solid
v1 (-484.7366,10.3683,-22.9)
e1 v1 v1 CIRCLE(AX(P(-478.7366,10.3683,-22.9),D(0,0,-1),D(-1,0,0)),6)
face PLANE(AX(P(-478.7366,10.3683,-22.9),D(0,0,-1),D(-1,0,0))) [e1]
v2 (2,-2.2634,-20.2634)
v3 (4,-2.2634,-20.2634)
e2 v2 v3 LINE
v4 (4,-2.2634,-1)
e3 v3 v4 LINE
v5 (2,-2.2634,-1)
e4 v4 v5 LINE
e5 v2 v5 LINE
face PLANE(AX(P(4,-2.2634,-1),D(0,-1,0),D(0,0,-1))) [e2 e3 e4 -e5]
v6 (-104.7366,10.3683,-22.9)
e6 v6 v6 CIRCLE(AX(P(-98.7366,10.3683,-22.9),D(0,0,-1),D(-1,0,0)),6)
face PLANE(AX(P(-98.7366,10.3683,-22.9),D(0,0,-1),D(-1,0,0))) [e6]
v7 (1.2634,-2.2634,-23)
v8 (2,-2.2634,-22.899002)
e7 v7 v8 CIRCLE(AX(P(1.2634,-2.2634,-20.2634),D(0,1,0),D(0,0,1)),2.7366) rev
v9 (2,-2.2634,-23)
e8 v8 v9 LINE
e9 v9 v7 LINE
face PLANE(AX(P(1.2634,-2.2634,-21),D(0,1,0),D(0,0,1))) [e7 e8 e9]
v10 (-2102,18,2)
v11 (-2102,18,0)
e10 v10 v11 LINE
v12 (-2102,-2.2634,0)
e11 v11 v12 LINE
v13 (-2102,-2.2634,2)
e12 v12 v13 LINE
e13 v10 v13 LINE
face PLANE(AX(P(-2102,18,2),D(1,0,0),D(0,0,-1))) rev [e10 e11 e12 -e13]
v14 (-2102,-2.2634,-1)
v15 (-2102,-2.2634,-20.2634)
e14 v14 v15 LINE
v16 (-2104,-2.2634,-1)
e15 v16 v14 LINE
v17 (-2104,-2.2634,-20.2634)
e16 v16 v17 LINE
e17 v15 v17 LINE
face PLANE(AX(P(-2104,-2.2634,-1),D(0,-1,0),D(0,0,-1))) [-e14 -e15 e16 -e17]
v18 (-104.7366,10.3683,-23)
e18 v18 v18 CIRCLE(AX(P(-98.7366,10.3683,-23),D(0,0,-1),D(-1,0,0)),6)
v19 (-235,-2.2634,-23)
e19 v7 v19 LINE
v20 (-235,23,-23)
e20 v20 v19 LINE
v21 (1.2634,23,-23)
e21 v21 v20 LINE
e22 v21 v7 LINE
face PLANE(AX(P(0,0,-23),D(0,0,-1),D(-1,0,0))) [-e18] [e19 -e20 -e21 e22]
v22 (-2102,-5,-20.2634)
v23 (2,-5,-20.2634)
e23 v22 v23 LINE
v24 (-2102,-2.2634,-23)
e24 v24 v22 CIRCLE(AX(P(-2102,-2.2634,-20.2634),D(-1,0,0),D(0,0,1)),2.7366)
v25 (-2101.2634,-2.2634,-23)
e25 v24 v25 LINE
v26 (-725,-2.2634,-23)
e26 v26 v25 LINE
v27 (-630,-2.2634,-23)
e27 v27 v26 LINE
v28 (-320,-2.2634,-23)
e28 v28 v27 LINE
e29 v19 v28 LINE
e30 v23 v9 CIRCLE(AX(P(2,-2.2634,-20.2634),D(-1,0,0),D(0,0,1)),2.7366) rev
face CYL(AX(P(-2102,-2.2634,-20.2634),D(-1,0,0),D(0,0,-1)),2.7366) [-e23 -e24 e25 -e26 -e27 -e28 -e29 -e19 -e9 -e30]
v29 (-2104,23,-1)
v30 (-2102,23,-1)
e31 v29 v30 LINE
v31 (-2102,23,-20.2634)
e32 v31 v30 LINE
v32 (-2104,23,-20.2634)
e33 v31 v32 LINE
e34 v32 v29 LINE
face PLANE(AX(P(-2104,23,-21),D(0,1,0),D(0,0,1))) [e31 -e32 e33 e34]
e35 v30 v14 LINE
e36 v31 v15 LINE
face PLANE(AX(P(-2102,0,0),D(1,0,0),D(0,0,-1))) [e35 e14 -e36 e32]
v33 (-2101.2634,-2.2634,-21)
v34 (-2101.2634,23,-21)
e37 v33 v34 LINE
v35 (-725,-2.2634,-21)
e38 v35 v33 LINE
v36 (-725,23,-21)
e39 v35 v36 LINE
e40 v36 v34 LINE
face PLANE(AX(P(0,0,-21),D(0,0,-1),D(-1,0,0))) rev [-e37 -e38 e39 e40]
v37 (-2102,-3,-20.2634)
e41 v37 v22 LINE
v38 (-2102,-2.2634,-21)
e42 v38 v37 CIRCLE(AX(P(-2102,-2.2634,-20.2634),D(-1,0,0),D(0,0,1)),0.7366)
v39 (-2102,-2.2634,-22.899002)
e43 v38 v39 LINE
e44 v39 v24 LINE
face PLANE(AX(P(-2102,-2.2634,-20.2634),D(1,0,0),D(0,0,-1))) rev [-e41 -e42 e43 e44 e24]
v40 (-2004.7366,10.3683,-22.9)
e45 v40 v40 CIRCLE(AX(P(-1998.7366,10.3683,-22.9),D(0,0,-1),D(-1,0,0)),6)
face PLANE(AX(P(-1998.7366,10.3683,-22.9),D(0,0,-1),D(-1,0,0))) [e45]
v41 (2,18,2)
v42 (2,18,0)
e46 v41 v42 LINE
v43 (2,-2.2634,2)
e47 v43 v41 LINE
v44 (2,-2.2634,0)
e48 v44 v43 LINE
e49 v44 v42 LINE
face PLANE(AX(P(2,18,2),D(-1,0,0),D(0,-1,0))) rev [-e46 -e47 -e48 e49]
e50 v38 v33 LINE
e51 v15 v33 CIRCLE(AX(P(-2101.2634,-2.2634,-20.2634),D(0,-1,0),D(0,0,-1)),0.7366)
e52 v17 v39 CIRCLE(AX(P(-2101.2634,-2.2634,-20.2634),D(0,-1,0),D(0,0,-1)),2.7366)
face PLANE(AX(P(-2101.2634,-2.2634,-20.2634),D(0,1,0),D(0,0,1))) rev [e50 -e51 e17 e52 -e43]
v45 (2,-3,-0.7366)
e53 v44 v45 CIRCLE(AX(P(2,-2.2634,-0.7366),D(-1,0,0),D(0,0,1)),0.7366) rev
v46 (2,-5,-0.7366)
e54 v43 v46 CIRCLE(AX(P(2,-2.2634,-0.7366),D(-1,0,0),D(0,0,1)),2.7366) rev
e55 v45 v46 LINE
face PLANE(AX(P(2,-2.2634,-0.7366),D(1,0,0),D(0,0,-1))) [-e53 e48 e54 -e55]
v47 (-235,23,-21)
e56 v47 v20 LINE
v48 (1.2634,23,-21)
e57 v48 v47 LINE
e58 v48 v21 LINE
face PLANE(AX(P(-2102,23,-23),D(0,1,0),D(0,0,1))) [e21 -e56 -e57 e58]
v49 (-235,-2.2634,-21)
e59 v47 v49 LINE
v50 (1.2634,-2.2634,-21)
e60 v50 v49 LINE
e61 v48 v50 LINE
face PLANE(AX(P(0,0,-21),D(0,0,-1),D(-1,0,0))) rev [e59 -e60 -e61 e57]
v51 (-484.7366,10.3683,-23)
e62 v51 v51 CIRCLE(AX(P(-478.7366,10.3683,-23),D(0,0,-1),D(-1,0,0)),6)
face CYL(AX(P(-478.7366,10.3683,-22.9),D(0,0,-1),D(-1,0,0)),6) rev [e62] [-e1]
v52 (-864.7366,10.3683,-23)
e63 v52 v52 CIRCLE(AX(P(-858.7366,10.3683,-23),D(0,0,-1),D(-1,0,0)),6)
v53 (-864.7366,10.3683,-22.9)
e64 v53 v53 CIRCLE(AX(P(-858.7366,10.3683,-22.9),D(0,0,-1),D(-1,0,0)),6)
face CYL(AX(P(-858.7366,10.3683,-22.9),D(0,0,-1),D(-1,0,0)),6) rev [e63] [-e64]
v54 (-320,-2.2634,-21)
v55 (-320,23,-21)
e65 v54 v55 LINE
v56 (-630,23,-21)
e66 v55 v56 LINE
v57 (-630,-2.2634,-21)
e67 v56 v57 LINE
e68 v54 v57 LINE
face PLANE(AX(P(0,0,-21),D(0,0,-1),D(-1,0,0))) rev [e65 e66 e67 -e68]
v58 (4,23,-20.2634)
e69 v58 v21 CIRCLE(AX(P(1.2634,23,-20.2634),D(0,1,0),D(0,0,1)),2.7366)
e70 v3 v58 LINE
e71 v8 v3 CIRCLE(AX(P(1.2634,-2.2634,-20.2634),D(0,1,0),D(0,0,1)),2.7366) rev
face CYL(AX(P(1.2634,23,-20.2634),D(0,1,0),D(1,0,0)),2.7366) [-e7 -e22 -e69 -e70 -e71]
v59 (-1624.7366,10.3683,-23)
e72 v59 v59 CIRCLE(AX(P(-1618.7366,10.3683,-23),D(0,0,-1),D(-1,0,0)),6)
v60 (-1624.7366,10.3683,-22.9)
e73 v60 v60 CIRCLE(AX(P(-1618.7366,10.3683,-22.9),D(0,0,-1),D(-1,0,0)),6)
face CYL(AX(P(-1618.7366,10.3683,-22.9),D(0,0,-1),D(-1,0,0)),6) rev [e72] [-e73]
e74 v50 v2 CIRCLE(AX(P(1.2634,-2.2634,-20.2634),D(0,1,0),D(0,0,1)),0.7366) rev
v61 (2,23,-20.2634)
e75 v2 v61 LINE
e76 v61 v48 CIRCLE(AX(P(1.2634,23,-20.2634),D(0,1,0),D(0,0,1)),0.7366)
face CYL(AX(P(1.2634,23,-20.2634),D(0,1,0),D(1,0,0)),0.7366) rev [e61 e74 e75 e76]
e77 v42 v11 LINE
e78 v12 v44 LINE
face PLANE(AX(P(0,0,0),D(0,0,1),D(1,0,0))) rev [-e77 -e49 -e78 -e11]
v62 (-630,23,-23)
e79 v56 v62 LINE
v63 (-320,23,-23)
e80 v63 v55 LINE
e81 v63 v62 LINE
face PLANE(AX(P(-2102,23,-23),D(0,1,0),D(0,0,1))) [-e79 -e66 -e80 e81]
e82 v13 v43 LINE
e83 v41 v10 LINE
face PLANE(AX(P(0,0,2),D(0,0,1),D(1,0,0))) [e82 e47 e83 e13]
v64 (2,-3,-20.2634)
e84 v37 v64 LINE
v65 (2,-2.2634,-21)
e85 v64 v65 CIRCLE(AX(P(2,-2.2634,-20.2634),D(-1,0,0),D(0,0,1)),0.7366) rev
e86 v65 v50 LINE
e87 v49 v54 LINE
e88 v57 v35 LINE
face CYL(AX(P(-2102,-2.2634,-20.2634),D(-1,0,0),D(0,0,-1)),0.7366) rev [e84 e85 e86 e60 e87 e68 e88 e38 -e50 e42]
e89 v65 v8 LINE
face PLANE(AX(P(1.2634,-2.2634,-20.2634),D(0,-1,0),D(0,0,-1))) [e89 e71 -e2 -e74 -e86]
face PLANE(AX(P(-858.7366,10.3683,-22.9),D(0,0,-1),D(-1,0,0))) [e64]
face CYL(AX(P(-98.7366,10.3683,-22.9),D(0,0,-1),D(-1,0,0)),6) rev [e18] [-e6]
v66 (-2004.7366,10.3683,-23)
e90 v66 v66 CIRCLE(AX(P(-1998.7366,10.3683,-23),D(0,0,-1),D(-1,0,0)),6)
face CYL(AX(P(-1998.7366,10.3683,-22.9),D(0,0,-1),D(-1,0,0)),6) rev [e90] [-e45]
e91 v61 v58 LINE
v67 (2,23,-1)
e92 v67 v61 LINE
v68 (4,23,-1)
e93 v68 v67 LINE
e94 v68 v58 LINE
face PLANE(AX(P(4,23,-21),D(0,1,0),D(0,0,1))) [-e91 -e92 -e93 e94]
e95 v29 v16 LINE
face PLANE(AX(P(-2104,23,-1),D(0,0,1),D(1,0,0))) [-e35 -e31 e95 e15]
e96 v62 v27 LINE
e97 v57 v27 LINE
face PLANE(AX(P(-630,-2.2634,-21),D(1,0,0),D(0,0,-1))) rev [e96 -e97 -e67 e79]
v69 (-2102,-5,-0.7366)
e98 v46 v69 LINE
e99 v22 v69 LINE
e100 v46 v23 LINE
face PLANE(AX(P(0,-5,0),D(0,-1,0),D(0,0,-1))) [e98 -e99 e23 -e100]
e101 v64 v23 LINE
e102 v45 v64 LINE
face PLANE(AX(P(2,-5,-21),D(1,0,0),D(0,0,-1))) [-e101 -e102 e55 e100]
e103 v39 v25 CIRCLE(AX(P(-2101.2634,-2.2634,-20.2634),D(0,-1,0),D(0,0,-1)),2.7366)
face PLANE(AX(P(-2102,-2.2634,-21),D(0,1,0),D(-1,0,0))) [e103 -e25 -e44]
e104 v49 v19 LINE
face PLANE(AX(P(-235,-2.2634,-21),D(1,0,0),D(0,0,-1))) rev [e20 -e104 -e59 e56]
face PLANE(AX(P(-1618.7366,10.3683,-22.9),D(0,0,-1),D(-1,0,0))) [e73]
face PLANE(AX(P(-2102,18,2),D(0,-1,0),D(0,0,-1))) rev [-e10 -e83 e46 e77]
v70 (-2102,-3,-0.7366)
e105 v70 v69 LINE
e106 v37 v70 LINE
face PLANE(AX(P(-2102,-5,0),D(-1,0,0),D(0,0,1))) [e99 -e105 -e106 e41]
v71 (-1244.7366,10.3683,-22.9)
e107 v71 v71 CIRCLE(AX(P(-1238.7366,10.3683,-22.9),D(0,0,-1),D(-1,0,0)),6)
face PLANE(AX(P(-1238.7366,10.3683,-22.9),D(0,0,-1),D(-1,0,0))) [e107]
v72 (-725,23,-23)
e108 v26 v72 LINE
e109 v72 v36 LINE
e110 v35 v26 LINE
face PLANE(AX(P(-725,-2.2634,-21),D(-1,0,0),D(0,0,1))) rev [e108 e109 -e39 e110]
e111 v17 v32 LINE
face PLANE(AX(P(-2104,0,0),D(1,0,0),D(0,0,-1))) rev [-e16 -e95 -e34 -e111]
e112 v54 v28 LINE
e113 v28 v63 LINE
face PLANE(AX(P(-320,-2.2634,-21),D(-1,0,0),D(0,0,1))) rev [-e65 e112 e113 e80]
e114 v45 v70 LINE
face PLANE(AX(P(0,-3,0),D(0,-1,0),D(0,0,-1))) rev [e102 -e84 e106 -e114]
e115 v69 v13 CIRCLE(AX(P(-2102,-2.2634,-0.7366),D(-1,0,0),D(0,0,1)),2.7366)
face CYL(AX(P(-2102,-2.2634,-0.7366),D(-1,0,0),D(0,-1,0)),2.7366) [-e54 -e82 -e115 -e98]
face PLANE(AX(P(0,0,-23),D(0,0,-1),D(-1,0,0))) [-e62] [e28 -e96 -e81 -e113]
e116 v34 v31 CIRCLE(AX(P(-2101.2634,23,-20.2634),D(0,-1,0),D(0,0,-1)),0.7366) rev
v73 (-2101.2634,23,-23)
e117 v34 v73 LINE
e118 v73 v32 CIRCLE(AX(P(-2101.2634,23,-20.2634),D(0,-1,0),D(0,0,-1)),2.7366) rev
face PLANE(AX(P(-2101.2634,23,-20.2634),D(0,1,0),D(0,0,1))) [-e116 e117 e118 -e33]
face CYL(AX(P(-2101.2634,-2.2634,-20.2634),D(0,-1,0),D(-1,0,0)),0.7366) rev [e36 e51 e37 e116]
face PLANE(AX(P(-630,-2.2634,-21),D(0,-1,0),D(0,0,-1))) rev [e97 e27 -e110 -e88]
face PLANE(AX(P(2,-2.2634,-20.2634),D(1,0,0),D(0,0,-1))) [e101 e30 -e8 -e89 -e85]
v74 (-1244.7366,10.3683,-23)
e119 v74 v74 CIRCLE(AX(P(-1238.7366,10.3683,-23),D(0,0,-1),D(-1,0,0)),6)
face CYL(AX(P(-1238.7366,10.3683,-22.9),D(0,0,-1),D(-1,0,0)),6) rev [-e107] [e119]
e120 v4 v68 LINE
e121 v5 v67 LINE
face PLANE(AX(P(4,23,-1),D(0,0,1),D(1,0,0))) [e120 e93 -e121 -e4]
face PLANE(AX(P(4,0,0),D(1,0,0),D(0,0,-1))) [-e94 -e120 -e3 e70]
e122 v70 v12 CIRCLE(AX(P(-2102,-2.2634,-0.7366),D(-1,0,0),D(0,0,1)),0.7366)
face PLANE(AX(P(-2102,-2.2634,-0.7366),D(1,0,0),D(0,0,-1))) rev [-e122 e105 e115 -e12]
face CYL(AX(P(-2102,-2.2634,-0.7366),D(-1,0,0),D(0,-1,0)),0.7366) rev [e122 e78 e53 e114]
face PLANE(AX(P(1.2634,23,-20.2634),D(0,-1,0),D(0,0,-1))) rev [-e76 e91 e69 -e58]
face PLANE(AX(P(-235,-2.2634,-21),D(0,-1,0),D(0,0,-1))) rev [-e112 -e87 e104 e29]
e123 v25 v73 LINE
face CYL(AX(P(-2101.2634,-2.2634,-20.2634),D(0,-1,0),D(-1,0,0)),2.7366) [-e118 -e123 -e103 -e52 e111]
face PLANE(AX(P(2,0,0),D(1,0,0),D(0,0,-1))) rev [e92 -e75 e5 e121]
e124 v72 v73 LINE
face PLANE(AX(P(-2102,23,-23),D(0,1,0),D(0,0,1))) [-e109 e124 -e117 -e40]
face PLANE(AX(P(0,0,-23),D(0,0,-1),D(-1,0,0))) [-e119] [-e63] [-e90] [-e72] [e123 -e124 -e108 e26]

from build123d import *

# Parameters (mm, degrees)
SKETCH_1_W                         = 2104
SKETCH_1_H                         = 21
SM_BASE_FLANGE_1_DEPTH             = 2
SM_EDGE_FLANGE_1_STRIP_W           = 9.4732
SM_EDGE_FLANGE_1_STRIP_H           = 2
SM_EDGE_FLANGE_1_STRIP_CUT_DEPTH   = 2104
SM_EDGE_FLANGE_1_DEPTH             = 2104
SM_EDGE_FLANGE_2_STRIP_W           = 9.4732
SM_EDGE_FLANGE_2_STRIP_H           = 2
SM_EDGE_FLANGE_2_STRIP_CUT_DEPTH   = 2104
SM_EDGE_FLANGE_2_DEPTH             = 2104
SM_EDGE_FLANGE_3_STRIP_W           = 9.4732
SM_EDGE_FLANGE_3_STRIP_H           = 2
SM_EDGE_FLANGE_3_STRIP_CUT_DEPTH   = 25.2634
SM_EDGE_FLANGE_3_STRIP_2_W         = 9.4732
SM_EDGE_FLANGE_3_STRIP_2_H         = 2
SM_EDGE_FLANGE_3_STRIP_CUT_2_DEPTH = 25.2634
SM_EDGE_FLANGE_3_DEPTH             = 25.2634
SM_EDGE_FLANGE_3_BEND_DEPTH        = 25.2634
SKETCH_18_W                        = 85
SKETCH_18_H                        = 39.234140159
SKETCH_18_W_2                      = 95
SKETCH_18_H_2                      = 42.308601705
CUT_EXTRUDE_1_DEPTH                = 2
SKETCH_19_R                        = 6
CUT_EXTRUDE_2_DEPTH                = 0.1


# Sheet-metal steps are written as plain solids
with BuildPart() as part:
    # Sketch 1 → 基体-法兰1 (new body)
    with BuildSketch(Plane.XY):
        with Locations((-1050, 7.5)):
            Rectangle(SKETCH_1_W, SKETCH_1_H)
    extrude(amount=SM_BASE_FLANGE_1_DEPTH)

    # 边线-法兰1 strip (across the edge) → 边线-法兰1 strip cut (cut)
    with BuildSketch(Plane(origin=(2, -3, 0), x_dir=(0, 1, 0), z_dir=(-1, 0, 0))):
        with Locations((-4, -1)):
            Rectangle(SM_EDGE_FLANGE_1_STRIP_W, SM_EDGE_FLANGE_1_STRIP_H)
    extrude(amount=SM_EDGE_FLANGE_1_STRIP_CUT_DEPTH, mode=Mode.SUBTRACT)

    # 边线-法兰1 section (across the edge) → 边线-法兰1 (add)
    with BuildSketch(Plane(origin=(2, -3, 0), x_dir=(0, 1, 0), z_dir=(-1, 0, 0))):
        with BuildLine():
            Line((-2, 0.7366), (-2, 21))
            Line((-2, 21), (0, 21))
            Line((0, 21), (0, 0.7366))
            ThreePointArc((0, 0.7366), (0.215745145, 0.215745145), (0.7366, 0))
            Line((0.7366, 0), (0.7366, -2))
            ThreePointArc((0.7366, -2), (-1.198468417, -1.198468417), (-2, 0.7366))
        make_face()
    extrude(amount=SM_EDGE_FLANGE_1_DEPTH)

    # 边线-法兰2 strip (across the edge) → 边线-法兰2 strip cut (cut)
    with BuildSketch(Plane(origin=(2, -3, -21), x_dir=(0, 0, 1), z_dir=(-1, 0, 0))):
        with Locations((-4, -1)):
            Rectangle(SM_EDGE_FLANGE_2_STRIP_W, SM_EDGE_FLANGE_2_STRIP_H)
    extrude(amount=SM_EDGE_FLANGE_2_STRIP_CUT_DEPTH, mode=Mode.SUBTRACT)

    # 边线-法兰2 section (across the edge) → 边线-法兰2 (add)
    with BuildSketch(Plane(origin=(2, -3, -21), x_dir=(0, 0, 1), z_dir=(-1, 0, 0))):
        with BuildLine():
            Line((-2, 0.7366), (-2, 26))
            Line((-2, 26), (0, 26))
            Line((0, 26), (0, 0.7366))
            ThreePointArc((0, 0.7366), (0.215745145, 0.215745145), (0.7366, 0))
            Line((0.7366, 0), (0.7366, -2))
            ThreePointArc((0.7366, -2), (-1.198468417, -1.198468417), (-2, 0.7366))
        make_face()
    extrude(amount=SM_EDGE_FLANGE_2_DEPTH)

    # 边线-法兰3 strip (across the edge) → 边线-法兰3 strip cut (cut)
    with BuildSketch(Plane(origin=(2, -2.2634, -21), x_dir=(-1, 0, 0), z_dir=(0, 1, 0))):
        with Locations((-4, -1)):
            Rectangle(SM_EDGE_FLANGE_3_STRIP_W, SM_EDGE_FLANGE_3_STRIP_H)
    extrude(amount=SM_EDGE_FLANGE_3_STRIP_CUT_DEPTH, mode=Mode.SUBTRACT)

    # 边线-法兰3 strip 2 (across the edge) → 边线-法兰3 strip cut 2 (cut)
    with BuildSketch(Plane(origin=(-2102, 23, -21), x_dir=(1, 0, 0), z_dir=(0, -1, 0))):
        with Locations((-4, -1)):
            Rectangle(SM_EDGE_FLANGE_3_STRIP_2_W, SM_EDGE_FLANGE_3_STRIP_2_H)
    extrude(amount=SM_EDGE_FLANGE_3_STRIP_CUT_2_DEPTH, mode=Mode.SUBTRACT)

    # 边线-法兰3 section (across the edge) → 边线-法兰3 (add)
    with BuildSketch(Plane(origin=(2, -2.2634, -21), x_dir=(-1, 0, 0), z_dir=(0, 1, 0))):
        with BuildLine():
            Line((-2, 0.7366), (-2, 20))
            Line((-2, 20), (0, 20))
            Line((0, 20), (0, 0.7366))
            ThreePointArc((0, 0.7366), (0.215745145, 0.215745145), (0.7366, 0))
            Line((0.7366, 0), (0.7366, -2))
            ThreePointArc((0.7366, -2), (-1.198468417, -1.198468417), (-2, 0.7366))
        make_face()
    extrude(amount=SM_EDGE_FLANGE_3_DEPTH)

    # 边线-法兰3 section 2 (across the edge) → 边线-法兰3 bend (add)
    with BuildSketch(Plane(origin=(-2102, 23, -21), x_dir=(1, 0, 0), z_dir=(0, -1, 0))):
        with BuildLine():
            Line((-2, 0.7366), (-2, 20))
            Line((-2, 20), (0, 20))
            Line((0, 20), (0, 0.7366))
            ThreePointArc((0, 0.7366), (0.215745145, 0.215745145), (0.7366, 0))
            Line((0.7366, 0), (0.7366, -2))
            ThreePointArc((0.7366, -2), (-1.198468417, -1.198468417), (-2, 0.7366))
        make_face()
    extrude(amount=SM_EDGE_FLANGE_3_BEND_DEPTH)

    # 草图18 → 切除-拉伸1 (cut)
    with BuildSketch(Plane(origin=(0, 0, -23), x_dir=(-1, 0, 0), z_dir=(0, 0, -1))):
        with Locations((277.5, 17.35367008)):
            Rectangle(SKETCH_18_W, SKETCH_18_H)
        with Locations((677.5, 18.890900853)):
            Rectangle(SKETCH_18_W_2, SKETCH_18_H_2)
    extrude(amount=-CUT_EXTRUDE_1_DEPTH, mode=Mode.SUBTRACT)

    # 草图19 → 切除-拉伸2 (cut)
    with BuildSketch(Plane(origin=(0, 0, -23), x_dir=(-1, 0, 0), z_dir=(0, 0, -1))):
        with Locations((98.7366, 10.3683)):
            Circle(SKETCH_19_R)
        with Locations((478.7366, 10.3683)):
            Circle(SKETCH_19_R)
        with Locations((858.7366, 10.3683)):
            Circle(SKETCH_19_R)
        with Locations((1238.7366, 10.3683)):
            Circle(SKETCH_19_R)
        with Locations((1618.7366, 10.3683)):
            Circle(SKETCH_19_R)
        with Locations((1998.7366, 10.3683)):
            Circle(SKETCH_19_R)
    extrude(amount=-CUT_EXTRUDE_2_DEPTH, mode=Mode.SUBTRACT)


solid = part.part
